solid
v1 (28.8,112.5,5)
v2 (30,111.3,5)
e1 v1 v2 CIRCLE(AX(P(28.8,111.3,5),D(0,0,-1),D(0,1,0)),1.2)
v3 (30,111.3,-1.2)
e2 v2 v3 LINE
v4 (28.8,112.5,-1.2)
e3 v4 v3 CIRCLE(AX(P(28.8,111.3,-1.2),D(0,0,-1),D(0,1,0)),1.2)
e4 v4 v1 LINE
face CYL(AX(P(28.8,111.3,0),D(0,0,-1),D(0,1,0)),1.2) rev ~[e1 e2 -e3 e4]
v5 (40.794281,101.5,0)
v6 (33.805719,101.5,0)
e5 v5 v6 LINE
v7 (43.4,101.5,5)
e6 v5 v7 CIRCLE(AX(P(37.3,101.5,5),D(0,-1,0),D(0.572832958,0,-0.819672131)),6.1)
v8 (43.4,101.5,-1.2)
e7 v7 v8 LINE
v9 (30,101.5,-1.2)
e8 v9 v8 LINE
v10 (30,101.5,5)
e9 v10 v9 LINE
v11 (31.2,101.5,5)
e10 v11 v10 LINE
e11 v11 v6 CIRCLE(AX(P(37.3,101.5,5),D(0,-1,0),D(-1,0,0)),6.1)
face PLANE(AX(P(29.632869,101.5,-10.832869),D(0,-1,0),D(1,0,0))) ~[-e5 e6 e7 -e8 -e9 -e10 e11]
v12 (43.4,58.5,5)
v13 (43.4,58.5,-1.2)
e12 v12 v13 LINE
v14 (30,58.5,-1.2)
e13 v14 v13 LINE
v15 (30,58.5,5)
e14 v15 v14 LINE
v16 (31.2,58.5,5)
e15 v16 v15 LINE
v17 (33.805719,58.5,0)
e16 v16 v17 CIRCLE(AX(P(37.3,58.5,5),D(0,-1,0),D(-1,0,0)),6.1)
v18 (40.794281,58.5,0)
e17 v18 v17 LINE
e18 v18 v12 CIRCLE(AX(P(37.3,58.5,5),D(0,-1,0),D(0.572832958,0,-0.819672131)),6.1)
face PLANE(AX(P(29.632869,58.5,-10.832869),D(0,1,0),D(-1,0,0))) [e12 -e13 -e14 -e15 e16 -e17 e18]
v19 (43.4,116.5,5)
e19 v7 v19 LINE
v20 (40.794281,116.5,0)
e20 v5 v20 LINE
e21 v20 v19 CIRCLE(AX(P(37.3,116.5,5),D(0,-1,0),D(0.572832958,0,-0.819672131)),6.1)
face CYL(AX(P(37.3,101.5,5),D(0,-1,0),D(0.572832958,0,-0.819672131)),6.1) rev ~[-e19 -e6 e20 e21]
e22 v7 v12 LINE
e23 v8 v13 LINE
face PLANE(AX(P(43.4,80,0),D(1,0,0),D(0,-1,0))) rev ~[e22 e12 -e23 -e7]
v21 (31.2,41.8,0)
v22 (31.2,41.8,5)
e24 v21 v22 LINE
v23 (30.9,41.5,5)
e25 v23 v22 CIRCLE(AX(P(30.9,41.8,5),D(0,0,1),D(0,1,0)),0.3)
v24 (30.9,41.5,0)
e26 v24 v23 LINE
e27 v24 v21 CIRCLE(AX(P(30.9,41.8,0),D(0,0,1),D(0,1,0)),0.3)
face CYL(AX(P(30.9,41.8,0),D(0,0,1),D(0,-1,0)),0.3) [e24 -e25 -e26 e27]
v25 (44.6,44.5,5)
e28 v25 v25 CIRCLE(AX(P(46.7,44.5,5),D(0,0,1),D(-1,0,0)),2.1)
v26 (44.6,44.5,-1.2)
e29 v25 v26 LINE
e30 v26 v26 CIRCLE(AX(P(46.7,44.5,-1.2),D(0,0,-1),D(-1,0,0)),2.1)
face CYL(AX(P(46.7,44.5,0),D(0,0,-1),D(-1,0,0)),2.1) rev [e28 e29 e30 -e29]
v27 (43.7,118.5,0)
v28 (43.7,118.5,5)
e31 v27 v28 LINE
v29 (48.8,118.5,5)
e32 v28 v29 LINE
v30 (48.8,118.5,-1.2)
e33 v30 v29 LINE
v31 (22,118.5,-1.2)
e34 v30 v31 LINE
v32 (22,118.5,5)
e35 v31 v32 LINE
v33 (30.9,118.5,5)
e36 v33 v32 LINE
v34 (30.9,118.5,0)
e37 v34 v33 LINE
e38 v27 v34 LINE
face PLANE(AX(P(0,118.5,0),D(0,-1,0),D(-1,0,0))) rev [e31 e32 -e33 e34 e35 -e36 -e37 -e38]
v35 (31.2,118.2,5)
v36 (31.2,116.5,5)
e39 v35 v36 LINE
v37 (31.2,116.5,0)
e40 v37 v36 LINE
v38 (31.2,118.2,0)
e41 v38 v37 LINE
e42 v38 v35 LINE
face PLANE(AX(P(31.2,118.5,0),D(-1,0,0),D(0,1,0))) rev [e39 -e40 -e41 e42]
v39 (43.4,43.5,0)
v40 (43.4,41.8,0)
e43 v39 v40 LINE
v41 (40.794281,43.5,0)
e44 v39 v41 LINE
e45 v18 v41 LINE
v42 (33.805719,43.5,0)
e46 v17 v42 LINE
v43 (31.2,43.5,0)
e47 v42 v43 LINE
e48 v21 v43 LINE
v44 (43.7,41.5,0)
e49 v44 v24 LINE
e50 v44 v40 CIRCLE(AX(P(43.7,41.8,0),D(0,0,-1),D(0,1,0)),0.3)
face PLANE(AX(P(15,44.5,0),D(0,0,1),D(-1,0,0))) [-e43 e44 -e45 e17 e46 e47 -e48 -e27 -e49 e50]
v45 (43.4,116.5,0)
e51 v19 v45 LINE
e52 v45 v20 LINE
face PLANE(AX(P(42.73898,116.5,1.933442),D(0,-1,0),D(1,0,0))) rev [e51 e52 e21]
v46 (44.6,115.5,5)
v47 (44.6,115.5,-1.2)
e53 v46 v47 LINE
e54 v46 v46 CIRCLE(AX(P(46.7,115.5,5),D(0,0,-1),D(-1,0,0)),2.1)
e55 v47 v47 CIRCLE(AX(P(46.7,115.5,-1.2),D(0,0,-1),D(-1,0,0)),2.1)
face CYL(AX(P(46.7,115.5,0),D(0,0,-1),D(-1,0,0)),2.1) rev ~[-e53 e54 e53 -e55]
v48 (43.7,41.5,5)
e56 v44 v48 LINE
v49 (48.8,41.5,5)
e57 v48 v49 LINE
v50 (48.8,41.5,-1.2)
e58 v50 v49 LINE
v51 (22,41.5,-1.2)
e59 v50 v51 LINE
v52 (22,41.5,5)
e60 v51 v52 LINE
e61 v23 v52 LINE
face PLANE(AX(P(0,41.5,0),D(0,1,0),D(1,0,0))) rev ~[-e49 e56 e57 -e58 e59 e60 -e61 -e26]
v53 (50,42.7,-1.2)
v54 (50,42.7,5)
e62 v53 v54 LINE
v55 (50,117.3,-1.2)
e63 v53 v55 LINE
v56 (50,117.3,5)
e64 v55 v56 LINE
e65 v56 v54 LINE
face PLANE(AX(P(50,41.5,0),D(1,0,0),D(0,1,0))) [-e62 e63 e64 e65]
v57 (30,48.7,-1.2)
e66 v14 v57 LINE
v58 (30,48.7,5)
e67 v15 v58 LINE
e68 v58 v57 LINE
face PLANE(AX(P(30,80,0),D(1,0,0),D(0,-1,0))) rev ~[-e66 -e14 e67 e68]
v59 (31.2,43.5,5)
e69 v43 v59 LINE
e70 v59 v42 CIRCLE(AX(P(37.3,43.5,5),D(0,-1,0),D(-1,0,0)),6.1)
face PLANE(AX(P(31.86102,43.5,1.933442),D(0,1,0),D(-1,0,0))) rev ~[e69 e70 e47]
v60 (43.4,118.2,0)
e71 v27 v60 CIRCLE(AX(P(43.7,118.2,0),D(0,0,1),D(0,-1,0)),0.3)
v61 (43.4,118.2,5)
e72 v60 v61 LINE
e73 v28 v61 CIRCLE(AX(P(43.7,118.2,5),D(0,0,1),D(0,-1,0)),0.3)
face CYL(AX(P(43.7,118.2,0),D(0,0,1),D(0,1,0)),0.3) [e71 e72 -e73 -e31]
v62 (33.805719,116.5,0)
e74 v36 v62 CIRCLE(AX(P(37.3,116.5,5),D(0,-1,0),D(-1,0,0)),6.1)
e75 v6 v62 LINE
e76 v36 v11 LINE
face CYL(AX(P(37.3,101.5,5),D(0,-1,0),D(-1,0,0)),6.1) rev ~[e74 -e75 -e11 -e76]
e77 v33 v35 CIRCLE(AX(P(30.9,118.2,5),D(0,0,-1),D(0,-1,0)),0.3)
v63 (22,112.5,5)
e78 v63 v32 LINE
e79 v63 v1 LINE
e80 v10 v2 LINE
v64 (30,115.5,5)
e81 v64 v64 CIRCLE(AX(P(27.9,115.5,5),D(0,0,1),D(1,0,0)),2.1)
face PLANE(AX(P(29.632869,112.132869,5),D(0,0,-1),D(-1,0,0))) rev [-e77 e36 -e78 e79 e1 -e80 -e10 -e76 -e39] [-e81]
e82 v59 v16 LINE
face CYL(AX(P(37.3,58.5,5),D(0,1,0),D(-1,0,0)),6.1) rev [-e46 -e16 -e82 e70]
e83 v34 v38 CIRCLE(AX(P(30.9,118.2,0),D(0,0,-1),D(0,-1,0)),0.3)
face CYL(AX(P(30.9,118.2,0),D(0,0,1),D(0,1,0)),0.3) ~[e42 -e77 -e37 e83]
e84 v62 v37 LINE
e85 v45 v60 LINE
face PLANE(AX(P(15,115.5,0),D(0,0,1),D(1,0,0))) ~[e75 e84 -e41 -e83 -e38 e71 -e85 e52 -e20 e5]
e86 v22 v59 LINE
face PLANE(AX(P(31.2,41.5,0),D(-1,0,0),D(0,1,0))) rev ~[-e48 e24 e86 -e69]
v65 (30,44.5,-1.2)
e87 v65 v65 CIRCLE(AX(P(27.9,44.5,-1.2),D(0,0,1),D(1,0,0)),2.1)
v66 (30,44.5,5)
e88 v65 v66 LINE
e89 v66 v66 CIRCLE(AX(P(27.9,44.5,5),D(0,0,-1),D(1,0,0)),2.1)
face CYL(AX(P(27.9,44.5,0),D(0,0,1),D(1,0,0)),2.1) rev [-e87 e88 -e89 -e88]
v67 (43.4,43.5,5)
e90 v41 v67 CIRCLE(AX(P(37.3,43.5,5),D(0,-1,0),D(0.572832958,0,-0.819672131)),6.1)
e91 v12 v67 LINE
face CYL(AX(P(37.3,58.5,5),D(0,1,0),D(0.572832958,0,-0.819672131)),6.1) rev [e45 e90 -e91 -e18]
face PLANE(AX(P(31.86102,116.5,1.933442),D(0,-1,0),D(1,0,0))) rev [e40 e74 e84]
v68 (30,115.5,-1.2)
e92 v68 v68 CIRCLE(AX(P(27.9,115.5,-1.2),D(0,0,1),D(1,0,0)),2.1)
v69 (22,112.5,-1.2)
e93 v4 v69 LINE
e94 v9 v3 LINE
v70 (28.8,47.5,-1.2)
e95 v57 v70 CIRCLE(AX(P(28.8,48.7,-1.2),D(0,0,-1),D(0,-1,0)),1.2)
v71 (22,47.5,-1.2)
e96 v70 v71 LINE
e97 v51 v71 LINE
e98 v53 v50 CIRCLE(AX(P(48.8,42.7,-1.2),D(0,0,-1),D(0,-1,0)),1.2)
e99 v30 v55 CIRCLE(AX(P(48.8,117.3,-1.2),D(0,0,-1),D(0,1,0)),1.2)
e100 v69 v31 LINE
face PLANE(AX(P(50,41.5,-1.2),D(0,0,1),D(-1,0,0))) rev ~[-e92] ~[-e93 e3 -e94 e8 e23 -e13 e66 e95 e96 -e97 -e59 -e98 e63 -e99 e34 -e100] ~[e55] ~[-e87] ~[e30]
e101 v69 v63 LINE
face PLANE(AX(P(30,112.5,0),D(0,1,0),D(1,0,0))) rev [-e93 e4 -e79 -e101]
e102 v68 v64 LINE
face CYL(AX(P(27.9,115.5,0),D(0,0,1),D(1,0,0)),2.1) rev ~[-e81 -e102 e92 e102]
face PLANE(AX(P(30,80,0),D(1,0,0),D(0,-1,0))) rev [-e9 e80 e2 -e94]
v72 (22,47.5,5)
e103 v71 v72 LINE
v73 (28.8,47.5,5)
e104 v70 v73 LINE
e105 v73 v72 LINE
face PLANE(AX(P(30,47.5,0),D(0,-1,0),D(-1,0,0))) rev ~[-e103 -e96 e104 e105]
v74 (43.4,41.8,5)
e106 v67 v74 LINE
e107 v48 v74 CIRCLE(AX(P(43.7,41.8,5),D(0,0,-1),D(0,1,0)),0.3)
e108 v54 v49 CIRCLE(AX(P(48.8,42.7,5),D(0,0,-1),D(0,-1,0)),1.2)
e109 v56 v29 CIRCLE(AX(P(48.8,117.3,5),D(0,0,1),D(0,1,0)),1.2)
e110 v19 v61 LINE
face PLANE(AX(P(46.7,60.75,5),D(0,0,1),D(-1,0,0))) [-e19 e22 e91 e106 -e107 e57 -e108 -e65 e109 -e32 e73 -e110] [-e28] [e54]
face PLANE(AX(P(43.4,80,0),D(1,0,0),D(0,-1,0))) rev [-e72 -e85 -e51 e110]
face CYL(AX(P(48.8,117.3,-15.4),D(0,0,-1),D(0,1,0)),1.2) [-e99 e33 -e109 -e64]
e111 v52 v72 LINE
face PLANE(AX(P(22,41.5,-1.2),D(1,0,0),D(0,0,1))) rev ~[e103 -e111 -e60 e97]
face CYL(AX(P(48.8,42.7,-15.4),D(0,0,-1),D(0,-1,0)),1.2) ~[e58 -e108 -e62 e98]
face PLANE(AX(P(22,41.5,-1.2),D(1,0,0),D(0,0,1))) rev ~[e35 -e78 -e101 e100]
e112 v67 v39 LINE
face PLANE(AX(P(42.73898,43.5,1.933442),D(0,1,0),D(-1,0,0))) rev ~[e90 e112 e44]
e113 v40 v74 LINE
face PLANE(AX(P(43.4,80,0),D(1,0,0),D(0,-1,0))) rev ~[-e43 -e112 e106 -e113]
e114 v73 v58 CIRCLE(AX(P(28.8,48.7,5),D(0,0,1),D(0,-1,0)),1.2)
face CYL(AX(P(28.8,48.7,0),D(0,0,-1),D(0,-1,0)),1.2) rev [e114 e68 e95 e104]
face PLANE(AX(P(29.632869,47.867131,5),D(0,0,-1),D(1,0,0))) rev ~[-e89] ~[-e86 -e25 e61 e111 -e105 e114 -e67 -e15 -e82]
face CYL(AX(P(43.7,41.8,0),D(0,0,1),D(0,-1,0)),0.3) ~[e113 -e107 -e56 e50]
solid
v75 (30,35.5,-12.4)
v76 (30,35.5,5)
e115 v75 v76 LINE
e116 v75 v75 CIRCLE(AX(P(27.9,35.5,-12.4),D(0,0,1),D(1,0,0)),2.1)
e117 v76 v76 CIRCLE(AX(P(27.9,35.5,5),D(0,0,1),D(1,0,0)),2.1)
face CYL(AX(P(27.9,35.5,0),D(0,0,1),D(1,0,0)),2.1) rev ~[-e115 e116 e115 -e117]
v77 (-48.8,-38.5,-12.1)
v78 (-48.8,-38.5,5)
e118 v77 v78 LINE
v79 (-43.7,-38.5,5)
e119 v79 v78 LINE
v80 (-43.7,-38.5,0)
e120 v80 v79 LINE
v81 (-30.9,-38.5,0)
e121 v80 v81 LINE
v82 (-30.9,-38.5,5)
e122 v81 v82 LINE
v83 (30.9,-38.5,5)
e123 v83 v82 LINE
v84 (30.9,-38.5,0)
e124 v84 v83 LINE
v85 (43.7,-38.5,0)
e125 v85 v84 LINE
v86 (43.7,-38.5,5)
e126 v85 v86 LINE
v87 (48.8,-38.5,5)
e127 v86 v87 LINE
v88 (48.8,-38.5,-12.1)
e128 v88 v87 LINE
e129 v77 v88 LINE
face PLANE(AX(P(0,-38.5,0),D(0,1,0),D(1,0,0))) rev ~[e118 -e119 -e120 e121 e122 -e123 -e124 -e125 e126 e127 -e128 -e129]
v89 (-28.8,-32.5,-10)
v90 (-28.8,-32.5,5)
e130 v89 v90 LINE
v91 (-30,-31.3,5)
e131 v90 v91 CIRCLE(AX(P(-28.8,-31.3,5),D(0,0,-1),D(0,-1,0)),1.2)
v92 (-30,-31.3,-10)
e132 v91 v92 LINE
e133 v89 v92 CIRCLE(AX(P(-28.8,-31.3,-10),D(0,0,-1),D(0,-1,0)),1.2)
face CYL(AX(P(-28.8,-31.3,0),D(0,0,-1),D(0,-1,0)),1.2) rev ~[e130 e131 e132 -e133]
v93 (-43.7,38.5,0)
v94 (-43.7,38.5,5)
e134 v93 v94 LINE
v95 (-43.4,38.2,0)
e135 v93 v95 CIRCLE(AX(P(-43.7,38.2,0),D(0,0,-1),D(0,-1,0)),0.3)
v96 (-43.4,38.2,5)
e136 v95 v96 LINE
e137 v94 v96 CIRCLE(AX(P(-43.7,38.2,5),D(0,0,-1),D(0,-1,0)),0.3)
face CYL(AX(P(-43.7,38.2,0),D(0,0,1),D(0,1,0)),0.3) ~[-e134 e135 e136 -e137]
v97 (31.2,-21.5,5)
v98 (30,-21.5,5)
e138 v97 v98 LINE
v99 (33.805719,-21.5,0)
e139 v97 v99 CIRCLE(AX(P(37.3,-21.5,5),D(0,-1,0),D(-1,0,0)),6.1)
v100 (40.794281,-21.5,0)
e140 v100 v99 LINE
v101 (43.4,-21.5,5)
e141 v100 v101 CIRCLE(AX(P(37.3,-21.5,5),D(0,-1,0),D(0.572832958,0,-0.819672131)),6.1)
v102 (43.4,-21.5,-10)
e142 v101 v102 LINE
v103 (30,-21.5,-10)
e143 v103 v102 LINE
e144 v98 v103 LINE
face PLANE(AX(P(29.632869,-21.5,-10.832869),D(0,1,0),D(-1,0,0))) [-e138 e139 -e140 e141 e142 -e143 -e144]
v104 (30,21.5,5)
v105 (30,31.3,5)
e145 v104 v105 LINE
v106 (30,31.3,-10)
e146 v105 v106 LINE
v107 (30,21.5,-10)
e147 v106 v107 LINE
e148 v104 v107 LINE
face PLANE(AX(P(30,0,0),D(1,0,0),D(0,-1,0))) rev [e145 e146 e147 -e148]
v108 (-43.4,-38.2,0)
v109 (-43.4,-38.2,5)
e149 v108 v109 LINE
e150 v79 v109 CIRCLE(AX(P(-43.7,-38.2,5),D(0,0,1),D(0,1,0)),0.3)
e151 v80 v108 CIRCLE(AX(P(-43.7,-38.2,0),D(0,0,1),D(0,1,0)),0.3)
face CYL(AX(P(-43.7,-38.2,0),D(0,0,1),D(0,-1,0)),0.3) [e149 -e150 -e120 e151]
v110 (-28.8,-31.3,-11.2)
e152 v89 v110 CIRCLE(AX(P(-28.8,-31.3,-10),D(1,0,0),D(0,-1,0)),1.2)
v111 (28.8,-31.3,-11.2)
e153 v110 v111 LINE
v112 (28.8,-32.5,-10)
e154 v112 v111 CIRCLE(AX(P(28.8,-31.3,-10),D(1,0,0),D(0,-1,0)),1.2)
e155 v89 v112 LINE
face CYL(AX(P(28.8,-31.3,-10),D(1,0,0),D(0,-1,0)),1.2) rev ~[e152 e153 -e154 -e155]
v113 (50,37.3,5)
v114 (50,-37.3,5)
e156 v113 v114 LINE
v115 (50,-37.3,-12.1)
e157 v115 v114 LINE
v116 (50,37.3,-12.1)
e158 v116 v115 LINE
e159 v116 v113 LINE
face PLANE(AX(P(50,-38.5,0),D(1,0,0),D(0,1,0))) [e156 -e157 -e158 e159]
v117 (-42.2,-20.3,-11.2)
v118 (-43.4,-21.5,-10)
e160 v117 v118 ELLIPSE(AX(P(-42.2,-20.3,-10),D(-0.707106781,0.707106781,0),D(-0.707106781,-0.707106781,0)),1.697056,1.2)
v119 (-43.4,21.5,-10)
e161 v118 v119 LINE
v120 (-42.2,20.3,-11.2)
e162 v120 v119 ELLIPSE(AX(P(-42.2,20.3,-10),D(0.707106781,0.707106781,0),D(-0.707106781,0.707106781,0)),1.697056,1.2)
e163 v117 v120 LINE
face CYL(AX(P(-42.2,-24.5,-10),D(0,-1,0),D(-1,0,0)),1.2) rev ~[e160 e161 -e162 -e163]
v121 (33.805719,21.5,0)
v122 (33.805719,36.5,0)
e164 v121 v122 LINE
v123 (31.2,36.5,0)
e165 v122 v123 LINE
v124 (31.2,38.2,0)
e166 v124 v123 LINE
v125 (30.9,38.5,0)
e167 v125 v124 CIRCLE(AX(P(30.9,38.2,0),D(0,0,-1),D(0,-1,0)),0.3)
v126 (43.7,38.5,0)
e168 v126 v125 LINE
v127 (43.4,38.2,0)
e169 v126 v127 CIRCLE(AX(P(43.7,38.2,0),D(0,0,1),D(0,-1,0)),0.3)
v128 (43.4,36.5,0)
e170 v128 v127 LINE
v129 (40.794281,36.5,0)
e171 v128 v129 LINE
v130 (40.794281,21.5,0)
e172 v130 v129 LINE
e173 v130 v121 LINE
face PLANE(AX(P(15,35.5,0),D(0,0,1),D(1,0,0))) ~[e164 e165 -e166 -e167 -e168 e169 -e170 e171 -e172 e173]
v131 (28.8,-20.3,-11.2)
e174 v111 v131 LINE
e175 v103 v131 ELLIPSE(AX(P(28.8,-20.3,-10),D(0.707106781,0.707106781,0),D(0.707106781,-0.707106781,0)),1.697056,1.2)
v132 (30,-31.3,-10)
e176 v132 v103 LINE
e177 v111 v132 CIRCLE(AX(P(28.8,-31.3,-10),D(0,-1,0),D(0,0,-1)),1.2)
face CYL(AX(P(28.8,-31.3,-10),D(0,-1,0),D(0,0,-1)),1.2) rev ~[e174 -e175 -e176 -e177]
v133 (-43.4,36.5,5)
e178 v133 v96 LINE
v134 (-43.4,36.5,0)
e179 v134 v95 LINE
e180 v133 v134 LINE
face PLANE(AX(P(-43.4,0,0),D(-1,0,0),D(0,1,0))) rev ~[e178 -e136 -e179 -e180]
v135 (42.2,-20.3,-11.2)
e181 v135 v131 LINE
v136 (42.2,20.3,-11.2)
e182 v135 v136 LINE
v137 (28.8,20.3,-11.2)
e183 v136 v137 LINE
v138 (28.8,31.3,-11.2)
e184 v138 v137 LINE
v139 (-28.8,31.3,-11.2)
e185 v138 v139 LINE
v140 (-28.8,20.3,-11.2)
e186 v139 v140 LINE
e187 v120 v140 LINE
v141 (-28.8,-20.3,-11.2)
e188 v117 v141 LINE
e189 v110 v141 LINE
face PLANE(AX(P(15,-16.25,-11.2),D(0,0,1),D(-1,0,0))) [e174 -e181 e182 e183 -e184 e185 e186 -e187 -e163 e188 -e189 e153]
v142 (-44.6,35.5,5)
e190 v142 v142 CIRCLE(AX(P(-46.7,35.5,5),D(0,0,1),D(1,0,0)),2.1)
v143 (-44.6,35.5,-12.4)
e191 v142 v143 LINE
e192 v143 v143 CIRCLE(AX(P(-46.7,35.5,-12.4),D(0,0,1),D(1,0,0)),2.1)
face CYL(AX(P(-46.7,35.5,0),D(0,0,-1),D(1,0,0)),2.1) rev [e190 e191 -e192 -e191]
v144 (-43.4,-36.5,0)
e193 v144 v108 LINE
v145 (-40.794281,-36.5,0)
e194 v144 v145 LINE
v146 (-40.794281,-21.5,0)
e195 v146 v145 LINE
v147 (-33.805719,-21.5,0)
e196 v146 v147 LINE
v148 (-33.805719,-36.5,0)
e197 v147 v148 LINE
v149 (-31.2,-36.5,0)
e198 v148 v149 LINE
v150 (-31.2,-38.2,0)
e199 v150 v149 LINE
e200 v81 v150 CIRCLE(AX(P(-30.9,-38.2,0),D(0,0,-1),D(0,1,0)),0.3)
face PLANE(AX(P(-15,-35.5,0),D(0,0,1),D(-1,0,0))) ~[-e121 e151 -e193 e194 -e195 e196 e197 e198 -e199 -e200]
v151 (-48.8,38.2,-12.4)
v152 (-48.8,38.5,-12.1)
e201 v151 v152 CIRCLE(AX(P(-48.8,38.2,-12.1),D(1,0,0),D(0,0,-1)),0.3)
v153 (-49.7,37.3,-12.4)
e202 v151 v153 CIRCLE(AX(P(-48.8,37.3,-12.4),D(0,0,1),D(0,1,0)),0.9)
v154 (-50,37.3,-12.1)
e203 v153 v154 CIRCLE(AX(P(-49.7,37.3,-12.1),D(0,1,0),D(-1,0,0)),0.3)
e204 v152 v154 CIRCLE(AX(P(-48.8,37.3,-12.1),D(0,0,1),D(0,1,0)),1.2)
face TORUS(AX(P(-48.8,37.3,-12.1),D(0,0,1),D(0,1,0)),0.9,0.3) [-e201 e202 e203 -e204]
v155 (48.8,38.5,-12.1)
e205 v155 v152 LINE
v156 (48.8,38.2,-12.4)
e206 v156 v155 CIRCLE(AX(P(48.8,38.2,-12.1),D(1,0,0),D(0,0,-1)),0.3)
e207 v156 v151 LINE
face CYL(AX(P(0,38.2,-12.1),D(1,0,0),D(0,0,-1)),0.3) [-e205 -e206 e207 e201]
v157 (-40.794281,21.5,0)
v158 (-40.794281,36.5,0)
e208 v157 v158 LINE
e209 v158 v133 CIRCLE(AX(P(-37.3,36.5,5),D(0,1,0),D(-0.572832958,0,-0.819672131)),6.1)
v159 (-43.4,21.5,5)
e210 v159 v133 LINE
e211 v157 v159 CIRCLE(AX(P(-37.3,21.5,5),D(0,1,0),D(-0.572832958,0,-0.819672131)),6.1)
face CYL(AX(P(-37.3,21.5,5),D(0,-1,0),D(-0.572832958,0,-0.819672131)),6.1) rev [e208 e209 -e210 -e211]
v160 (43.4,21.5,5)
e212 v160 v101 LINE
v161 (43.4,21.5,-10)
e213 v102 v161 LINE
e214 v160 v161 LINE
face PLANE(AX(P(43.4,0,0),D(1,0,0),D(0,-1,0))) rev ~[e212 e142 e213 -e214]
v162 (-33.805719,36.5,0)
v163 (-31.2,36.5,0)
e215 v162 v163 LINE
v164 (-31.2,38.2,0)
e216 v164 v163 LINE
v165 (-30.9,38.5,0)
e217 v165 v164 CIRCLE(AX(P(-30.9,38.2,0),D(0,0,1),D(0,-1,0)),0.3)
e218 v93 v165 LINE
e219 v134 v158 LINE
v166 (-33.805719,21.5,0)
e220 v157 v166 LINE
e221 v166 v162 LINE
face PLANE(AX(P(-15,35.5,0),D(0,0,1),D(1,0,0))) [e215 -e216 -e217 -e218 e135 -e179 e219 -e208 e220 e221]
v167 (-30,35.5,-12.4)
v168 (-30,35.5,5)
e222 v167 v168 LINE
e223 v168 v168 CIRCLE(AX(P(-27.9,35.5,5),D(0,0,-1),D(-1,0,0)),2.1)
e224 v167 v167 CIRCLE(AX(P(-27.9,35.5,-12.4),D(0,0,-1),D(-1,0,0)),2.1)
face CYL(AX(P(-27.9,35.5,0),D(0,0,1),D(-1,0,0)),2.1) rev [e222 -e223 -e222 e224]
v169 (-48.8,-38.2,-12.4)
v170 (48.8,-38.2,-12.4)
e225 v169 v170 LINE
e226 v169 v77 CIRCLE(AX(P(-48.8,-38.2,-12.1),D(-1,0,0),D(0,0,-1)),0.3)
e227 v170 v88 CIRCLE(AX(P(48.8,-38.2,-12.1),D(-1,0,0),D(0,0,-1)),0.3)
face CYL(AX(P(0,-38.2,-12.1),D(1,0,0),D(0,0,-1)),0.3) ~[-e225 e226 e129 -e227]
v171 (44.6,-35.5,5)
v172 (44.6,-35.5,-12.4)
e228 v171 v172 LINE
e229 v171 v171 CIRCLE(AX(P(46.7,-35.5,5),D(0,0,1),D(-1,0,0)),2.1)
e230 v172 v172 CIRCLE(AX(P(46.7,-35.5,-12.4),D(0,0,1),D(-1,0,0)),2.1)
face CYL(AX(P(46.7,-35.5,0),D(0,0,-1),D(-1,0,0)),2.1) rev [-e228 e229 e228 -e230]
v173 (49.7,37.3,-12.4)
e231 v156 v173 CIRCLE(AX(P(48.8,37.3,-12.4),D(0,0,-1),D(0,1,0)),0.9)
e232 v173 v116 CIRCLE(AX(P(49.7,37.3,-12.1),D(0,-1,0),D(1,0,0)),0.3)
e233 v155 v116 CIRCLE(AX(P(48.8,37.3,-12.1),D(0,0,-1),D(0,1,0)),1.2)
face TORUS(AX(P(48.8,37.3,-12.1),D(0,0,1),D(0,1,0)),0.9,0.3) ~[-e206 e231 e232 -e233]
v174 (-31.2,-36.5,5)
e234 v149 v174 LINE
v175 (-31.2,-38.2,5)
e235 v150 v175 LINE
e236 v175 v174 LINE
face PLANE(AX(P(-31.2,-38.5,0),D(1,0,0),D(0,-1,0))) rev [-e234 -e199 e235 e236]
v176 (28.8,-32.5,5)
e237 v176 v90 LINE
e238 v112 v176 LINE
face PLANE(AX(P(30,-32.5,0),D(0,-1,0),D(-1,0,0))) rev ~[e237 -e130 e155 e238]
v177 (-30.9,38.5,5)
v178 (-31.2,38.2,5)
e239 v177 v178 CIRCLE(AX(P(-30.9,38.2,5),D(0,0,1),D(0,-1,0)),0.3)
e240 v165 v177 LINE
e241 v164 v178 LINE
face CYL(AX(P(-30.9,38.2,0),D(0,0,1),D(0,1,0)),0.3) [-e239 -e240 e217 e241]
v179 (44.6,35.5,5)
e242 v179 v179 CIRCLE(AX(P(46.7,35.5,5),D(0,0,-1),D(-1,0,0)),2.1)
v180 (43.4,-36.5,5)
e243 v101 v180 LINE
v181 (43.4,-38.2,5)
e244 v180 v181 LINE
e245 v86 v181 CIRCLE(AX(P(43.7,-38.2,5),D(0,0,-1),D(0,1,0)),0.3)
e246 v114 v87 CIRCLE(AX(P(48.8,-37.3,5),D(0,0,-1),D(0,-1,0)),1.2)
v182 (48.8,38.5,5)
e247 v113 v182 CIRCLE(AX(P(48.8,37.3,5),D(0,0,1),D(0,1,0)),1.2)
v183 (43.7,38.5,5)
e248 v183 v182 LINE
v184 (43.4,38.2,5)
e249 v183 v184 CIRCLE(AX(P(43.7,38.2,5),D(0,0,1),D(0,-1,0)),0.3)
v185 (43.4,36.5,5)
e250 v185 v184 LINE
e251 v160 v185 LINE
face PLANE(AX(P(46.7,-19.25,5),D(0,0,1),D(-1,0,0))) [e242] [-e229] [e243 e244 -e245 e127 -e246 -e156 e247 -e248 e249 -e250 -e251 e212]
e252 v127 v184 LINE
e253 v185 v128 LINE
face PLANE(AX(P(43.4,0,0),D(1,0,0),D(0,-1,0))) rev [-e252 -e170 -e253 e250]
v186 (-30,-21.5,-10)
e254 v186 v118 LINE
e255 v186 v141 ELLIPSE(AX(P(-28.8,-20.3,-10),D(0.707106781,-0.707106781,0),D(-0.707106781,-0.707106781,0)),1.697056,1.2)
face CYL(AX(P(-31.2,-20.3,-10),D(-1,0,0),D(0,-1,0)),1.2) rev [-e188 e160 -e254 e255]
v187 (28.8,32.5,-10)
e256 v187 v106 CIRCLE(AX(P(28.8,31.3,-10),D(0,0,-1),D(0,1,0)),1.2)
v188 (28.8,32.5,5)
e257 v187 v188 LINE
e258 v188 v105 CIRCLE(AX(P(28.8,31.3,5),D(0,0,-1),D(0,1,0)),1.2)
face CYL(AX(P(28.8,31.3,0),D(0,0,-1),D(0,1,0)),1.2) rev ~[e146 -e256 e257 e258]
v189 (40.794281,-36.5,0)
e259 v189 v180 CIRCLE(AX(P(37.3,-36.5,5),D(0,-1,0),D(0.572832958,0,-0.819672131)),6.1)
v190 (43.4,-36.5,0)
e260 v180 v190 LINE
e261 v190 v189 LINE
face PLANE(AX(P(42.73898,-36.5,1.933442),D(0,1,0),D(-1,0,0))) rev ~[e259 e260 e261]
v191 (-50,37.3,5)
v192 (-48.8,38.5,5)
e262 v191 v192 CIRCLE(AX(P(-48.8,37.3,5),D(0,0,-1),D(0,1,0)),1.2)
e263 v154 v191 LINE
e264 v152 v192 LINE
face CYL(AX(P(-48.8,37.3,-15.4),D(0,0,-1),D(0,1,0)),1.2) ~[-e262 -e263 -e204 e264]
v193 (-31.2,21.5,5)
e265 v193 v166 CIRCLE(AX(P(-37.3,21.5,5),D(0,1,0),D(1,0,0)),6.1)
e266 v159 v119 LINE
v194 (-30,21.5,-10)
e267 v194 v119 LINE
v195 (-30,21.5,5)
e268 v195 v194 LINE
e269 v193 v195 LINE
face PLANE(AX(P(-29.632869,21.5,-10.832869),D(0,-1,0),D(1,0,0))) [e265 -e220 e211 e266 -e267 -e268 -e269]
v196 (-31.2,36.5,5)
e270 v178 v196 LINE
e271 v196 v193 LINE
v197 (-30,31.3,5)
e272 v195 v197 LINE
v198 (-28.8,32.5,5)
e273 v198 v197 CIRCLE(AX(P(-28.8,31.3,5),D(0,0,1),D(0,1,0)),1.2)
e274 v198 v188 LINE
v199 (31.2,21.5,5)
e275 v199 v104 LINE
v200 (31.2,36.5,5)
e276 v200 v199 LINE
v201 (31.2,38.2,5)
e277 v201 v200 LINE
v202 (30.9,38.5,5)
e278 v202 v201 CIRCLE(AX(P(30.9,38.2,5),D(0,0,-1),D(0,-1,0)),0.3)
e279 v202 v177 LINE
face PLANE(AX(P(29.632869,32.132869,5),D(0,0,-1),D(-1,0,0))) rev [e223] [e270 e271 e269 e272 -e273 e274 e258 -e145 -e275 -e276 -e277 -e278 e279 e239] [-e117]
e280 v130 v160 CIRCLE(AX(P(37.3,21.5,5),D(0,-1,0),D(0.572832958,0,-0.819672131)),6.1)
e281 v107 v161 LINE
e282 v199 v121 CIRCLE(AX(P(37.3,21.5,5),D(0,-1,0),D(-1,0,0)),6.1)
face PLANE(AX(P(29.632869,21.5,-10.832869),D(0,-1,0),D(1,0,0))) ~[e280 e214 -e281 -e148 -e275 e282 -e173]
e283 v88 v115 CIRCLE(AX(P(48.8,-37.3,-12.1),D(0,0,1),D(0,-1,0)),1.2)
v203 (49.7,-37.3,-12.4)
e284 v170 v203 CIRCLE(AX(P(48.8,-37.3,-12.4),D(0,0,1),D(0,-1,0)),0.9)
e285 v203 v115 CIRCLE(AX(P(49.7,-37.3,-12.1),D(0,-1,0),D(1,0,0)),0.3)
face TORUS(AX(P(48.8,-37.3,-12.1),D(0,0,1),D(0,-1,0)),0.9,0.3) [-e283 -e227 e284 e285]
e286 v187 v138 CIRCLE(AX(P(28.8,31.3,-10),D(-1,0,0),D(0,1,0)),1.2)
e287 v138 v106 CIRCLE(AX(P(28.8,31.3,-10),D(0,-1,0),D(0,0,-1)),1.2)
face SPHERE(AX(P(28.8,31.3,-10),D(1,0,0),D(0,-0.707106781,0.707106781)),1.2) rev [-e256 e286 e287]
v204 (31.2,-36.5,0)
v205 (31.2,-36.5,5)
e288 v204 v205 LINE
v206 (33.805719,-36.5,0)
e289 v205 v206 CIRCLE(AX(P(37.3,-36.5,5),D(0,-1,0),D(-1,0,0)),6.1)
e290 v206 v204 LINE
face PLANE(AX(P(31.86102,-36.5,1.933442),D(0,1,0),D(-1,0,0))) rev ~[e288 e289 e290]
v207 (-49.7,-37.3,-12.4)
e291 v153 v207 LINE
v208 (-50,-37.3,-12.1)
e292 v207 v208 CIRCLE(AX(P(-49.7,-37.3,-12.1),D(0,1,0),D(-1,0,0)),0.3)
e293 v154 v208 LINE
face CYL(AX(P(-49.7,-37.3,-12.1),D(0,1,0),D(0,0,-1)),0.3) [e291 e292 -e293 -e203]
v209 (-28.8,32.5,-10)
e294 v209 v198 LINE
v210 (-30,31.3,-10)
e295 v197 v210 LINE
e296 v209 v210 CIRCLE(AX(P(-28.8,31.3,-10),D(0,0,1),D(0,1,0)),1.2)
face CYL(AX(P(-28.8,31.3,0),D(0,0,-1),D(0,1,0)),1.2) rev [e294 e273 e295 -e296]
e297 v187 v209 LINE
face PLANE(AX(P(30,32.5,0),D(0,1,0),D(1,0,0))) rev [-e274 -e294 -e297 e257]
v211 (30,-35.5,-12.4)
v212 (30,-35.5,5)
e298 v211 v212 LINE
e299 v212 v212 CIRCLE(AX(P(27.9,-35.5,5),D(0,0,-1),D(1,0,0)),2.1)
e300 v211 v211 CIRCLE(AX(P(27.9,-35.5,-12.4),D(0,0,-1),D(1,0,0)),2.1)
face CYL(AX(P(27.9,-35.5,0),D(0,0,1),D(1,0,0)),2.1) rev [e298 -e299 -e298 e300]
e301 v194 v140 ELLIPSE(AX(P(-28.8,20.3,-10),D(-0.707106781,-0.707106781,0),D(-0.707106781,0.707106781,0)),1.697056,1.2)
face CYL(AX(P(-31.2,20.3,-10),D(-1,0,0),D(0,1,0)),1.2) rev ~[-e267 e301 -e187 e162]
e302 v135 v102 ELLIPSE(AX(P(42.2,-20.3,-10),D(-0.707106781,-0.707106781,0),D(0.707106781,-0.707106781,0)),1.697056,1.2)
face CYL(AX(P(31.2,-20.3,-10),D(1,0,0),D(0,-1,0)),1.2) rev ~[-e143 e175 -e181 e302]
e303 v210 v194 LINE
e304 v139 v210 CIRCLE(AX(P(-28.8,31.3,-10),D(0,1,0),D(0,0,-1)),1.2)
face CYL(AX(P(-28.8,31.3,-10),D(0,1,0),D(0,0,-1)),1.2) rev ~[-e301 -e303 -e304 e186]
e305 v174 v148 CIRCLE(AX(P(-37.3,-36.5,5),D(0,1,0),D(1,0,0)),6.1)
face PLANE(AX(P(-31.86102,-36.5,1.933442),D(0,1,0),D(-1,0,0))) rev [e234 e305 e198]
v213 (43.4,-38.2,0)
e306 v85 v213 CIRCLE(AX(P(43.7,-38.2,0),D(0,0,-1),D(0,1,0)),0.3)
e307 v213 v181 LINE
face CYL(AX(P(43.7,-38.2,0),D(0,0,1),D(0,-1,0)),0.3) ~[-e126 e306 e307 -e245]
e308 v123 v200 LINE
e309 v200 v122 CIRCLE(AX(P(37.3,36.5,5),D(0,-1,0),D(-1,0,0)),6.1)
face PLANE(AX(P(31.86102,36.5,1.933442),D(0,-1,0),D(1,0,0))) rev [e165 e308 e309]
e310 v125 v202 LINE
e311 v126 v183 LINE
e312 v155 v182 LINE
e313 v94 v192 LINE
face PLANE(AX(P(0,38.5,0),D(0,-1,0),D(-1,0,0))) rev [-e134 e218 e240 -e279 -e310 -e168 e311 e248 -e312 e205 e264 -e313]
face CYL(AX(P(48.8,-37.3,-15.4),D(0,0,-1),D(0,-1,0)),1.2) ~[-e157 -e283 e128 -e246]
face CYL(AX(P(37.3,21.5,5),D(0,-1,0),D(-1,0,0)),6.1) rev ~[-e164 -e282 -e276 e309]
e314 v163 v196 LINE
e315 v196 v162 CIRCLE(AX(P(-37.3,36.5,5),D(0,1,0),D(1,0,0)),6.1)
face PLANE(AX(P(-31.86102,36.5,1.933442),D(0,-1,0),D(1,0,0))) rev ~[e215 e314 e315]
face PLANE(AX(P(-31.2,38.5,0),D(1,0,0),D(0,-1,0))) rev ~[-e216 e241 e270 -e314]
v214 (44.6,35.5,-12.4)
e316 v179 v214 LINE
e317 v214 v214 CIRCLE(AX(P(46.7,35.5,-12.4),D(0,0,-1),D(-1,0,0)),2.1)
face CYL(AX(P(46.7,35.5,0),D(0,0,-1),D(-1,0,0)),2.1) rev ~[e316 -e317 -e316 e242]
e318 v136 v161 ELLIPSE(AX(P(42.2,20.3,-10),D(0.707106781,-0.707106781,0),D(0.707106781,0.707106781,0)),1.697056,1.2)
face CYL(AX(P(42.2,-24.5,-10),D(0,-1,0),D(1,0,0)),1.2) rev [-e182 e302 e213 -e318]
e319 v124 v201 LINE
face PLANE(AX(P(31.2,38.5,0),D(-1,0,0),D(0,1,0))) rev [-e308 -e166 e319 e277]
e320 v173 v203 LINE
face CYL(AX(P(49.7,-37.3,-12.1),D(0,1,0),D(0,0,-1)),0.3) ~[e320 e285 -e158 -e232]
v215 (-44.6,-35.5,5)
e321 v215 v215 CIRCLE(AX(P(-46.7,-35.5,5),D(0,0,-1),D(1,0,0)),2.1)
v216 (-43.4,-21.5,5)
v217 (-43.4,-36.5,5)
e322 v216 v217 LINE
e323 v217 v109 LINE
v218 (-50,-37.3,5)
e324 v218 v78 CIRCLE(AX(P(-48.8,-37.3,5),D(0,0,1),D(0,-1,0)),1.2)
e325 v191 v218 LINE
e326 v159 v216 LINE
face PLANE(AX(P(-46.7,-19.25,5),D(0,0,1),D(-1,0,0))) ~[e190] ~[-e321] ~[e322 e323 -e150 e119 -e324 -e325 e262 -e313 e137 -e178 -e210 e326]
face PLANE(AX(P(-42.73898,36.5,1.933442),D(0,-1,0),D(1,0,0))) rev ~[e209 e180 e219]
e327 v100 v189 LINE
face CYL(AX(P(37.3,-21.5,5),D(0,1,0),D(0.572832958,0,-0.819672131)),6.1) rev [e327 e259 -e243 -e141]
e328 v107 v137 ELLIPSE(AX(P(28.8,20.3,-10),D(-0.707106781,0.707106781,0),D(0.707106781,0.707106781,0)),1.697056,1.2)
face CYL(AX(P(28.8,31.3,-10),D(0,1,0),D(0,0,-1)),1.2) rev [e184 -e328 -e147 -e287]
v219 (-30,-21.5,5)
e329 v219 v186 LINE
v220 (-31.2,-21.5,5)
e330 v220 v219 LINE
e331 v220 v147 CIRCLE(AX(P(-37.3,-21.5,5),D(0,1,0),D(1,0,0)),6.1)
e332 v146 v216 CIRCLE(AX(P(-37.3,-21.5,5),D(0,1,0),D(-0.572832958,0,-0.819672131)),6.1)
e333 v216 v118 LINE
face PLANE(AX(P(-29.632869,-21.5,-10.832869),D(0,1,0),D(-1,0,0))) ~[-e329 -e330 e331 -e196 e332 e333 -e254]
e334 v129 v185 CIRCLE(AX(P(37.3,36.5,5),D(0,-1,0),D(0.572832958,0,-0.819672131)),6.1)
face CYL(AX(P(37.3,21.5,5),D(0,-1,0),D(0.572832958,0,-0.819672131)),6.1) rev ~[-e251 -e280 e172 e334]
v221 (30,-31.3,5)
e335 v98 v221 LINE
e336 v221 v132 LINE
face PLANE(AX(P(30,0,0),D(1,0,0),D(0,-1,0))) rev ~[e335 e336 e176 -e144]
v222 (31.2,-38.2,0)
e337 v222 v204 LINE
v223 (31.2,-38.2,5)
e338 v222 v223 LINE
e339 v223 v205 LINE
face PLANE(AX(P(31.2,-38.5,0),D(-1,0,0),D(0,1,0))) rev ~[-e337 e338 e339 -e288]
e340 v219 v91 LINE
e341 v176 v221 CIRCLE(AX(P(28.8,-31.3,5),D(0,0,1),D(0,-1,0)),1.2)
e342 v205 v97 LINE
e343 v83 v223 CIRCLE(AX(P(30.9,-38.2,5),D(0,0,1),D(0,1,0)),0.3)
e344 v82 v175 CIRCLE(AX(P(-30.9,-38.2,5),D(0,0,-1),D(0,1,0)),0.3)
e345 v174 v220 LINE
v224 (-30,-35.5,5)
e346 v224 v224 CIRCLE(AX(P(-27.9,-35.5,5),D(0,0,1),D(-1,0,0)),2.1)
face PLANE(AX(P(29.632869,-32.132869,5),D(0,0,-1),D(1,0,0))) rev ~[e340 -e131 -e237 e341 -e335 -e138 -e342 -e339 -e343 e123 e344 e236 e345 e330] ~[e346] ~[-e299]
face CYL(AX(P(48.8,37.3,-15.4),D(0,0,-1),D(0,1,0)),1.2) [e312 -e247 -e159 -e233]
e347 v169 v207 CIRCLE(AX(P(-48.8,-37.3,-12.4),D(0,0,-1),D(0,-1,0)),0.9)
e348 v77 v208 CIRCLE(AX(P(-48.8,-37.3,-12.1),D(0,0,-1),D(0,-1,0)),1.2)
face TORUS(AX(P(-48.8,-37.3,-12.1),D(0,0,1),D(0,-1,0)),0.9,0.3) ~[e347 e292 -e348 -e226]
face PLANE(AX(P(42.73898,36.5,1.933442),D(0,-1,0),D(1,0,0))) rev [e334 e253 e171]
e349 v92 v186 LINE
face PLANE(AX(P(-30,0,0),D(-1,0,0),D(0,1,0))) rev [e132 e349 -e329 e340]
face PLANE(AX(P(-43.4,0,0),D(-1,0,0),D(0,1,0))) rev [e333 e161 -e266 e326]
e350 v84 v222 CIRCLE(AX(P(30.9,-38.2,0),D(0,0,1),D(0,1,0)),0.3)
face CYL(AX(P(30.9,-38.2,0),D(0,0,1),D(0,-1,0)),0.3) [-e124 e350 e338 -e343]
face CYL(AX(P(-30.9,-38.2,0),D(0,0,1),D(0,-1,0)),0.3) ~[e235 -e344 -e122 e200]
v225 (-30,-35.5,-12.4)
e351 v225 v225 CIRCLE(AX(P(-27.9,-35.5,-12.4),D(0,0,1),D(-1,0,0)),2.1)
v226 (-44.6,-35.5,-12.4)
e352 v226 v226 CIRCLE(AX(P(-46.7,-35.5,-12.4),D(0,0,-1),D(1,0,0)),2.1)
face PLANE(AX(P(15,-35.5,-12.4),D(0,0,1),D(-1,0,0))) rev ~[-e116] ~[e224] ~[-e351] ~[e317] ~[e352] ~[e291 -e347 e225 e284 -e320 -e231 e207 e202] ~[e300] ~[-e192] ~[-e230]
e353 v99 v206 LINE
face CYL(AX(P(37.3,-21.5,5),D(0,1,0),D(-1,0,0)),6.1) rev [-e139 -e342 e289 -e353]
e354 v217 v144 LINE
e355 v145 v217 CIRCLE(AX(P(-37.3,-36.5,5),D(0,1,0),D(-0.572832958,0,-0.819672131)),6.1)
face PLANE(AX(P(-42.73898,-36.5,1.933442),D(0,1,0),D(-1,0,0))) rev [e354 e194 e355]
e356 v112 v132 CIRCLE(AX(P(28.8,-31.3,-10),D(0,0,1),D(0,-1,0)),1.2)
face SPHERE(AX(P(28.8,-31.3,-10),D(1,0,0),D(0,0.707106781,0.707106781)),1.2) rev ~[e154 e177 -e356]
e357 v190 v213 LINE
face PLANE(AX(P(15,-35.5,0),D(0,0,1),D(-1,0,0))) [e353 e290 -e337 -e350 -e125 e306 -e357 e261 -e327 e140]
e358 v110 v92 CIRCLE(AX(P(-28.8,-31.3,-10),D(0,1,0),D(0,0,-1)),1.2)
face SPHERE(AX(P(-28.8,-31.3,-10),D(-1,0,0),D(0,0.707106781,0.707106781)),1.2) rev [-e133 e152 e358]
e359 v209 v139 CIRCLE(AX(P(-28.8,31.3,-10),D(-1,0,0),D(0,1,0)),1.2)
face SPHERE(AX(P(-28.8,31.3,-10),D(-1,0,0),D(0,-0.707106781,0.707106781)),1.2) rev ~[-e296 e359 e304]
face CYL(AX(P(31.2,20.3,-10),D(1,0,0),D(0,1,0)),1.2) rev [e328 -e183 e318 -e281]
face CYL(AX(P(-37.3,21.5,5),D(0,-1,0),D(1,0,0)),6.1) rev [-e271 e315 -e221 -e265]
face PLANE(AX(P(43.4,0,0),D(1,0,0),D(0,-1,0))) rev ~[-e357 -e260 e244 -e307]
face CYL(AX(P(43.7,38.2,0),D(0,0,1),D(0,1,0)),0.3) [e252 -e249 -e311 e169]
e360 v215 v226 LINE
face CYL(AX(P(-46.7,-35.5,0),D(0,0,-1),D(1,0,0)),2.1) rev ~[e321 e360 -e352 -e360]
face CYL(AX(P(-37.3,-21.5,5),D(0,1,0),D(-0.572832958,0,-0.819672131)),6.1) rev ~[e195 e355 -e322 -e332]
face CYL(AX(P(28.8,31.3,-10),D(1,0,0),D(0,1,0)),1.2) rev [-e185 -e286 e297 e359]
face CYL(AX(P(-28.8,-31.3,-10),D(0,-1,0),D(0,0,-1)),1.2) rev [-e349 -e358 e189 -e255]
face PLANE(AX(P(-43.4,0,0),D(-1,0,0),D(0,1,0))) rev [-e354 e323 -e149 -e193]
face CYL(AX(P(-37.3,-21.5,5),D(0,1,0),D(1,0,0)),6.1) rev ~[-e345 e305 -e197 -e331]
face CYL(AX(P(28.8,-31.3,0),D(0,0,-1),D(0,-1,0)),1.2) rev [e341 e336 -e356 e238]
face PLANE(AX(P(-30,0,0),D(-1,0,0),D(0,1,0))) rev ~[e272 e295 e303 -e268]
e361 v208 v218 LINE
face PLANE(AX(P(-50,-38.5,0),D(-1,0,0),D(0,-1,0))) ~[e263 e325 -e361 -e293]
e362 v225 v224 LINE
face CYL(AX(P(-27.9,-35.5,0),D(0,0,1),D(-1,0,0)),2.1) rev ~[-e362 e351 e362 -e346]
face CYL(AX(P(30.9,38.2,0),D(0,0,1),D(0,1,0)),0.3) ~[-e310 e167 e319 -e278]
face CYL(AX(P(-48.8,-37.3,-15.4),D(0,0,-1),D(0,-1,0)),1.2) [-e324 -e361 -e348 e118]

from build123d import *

# Parameters (mm, degrees)
F0_W         = 30
F0_H         = 32.5
F0_W_2       = 12.2
F0_H_2       = 21.5
F0_R         = 2.1
F0_H_3       = 15
F0_H_4       = 2
F1_DEPTH     = 12.4
F2_DEPTH     = 11.2
F3_DEPTH     = 5
F5_DEPTH     = 1.2
F7_DEPTH     = 15
F8_T1_DEPTH  = 24.5
F8_T3_DEPTH  = 15.2
F8_T5_DEPTH  = 10
F8_T7_DEPTH  = 5
F8_T9_DEPTH  = 9.8
F8_T11_DEPTH = 28.8
F8_T13_DEPTH = 1.2
F8_S17_W     = 1.2
F8_S17_H     = 1.2
F8_T18_DEPTH = 1.2
F8_T25_DEPTH = 4.2
F8_T29_DEPTH = 12.8
F8_T32_DEPTH = 23.4
F9_R         = 0.3
F14_DEPTH    = 77


# Not quite as in the source:
# - a fillet or chamfer that OpenCascade refuses, or shapes differently, is made with other operations: its cross-section is extruded or revolved along the edge and cut away or added


with BuildPart() as f1:
    # F0 (on Top) → F1 (new body)
    with BuildSketch(Plane.XY):
        Polygon((-30, 32.5), (0, 32.5), (0, 38.5), (-30, 38.5), (-30, 35.5), align=None)
        with BuildLine():
            ThreePointArc((-25.8, 35.5), (-27.9, 33.4), (-30, 35.5))
            ThreePointArc((-30, 35.5), (-27.9, 37.6), (-25.8, 35.5))
        make_face(mode=Mode.SUBTRACT)
        with Locations((-15, 16.25)):
            Rectangle(F0_W, F0_H)
        with Locations((-37.3, 10.75)):
            Rectangle(F0_W_2, F0_H_2)
        Polygon((-50, 0), (-43.4, 0), (-43.4, 21.5), (-43.4, 36.5), (-43.4, 38.5), (-50, 38.5), align=None)
        with Locations((-46.7, 35.5)):
            Circle(F0_R, mode=Mode.SUBTRACT)
        with Locations((-37.3, 29)):
            Rectangle(F0_W_2, F0_H_3)
        with Locations((-37.3, 37.5)):
            Rectangle(F0_W_2, F0_H_4)
        Polygon((-31.2, 0), (-30, 0), (-30, 32.5), (-30, 35.5), (-30, 38.5), (-31.2, 38.5), (-31.2, 36.5), (-31.2, 21.5), align=None)
    extrude(amount=-F1_DEPTH)

    # F0 (on Top) → F2 (cut)
    with BuildSketch(Plane.XY):
        with Locations((-15, 16.25)):
            Rectangle(F0_W, F0_H)
        with Locations((-37.3, 10.75)):
            Rectangle(F0_W_2, F0_H_2)
    extrude(amount=-F2_DEPTH, mode=Mode.SUBTRACT)

    # F0 (on Top) → F3 (join)
    with BuildSketch(Plane.XY):
        Polygon((-30, 32.5), (0, 32.5), (0, 38.5), (-30, 38.5), (-30, 35.5), align=None)
        with BuildLine():
            ThreePointArc((-25.8, 35.5), (-27.9, 33.4), (-30, 35.5))
            ThreePointArc((-30, 35.5), (-27.9, 37.6), (-25.8, 35.5))
        make_face(mode=Mode.SUBTRACT)
        Polygon((-31.2, 0), (-30, 0), (-30, 32.5), (-30, 35.5), (-30, 38.5), (-31.2, 38.5), (-31.2, 36.5), (-31.2, 21.5), align=None)
        Polygon((-50, 0), (-43.4, 0), (-43.4, 21.5), (-43.4, 36.5), (-43.4, 38.5), (-50, 38.5), align=None)
        with Locations((-46.7, 35.5)):
            Circle(F0_R, mode=Mode.SUBTRACT)
    extrude(amount=F3_DEPTH)

    # F4 (on face) → F5 (cut, through all)
    with BuildSketch(Plane(origin=(-31.2, 0, 0), x_dir=(0, -1, 0), z_dir=(-1, 0, 0))):
        Polygon((-21.5, 0), (-21.5, -11.2), (0, -11.2), (0, 5), (-21.5, 5), align=None)
    extrude(amount=-F5_DEPTH, mode=Mode.SUBTRACT)

    # F6 (on face) → F7 (join)
    with BuildSketch(Plane.XZ.offset(-21.5)):
        with BuildLine():
            ThreePointArc((-31.2, 5), (-31.8905122999, 2.1808790693), (-33.8057189581, 0))
            Line((-33.8057189581, 0), (-31.2, 0))
            Line((-31.2, 0), (-31.2, 5))
        make_face()
        with BuildLine():
            ThreePointArc((-40.7942810419, 0), (-42.7094877001, 2.1808790693), (-43.4, 5))
            Line((-43.4, 5), (-43.4, 0))
            Line((-43.4, 0), (-40.7942810419, 0))
        make_face()
    extrude(amount=-F7_DEPTH)

    # F8: fillet of radius 1.2 on 9 edges, made by hand

    # F8_s2 → F8_t1 (join)
    with BuildSketch(Plane.XZ.offset(-24.5)):
        with BuildLine():
            ThreePointArc((-43.4, -10), (-43.0485281374, -10.8485281374), (-42.2, -11.2))
            Line((-42.2, -11.2), (-43.4, -11.2))
            Line((-43.4, -11.2), (-43.4, -10))
        make_face()
    extrude(amount=F8_T1_DEPTH)

    # F8_s4 → F8_t3 (join)
    with BuildSketch(Plane.YZ.offset(-46.4)):
        with BuildLine():
            ThreePointArc((21.5, -10), (21.1485281374, -10.8485281374), (20.3, -11.2))
            Line((20.3, -11.2), (21.5, -11.2))
            Line((21.5, -11.2), (21.5, -10))
        make_face()
    extrude(amount=F8_T3_DEPTH)

    # F8_s6 → F8_t5 (join)
    with BuildSketch(Plane.XY.offset(-10)):
        with BuildLine():
            ThreePointArc((-28.8, 32.5), (-29.6485281374, 32.1485281374), (-30, 31.3))
            Line((-30, 31.3), (-30, 32.5))
            Line((-30, 32.5), (-28.8, 32.5))
        make_face()
    extrude(amount=F8_T5_DEPTH)

    # F8_s8 → F8_t7 (join)
    with BuildSketch(Plane.XY):
        with BuildLine():
            ThreePointArc((-28.8, 32.5), (-29.6485281374, 32.1485281374), (-30, 31.3))
            Line((-30, 31.3), (-30, 32.5))
            Line((-30, 32.5), (-28.8, 32.5))
        make_face()
    extrude(amount=F8_T7_DEPTH)

    # F8_s10 → F8_t9 (join)
    with BuildSketch(Plane.XZ.offset(-31.3)):
        with BuildLine():
            ThreePointArc((-28.8, -11.2), (-29.6485281374, -10.8485281374), (-30, -10))
            Line((-30, -10), (-30, -11.2))
            Line((-30, -11.2), (-28.8, -11.2))
        make_face()
    extrude(amount=F8_T9_DEPTH)

    # F8_s12 → F8_t11 (join)
    with BuildSketch(Plane.YZ.offset(-28.8)):
        with BuildLine():
            ThreePointArc((32.5, -10), (32.1485281374, -10.8485281374), (31.3, -11.2))
            Line((31.3, -11.2), (32.5, -11.2))
            Line((32.5, -11.2), (32.5, -10))
        make_face()
    extrude(amount=F8_T11_DEPTH)

    # F8_s14 → F8_t13 (join)
    with BuildSketch(Plane.YZ.offset(-31.2)):
        with BuildLine():
            ThreePointArc((21.5, -10), (21.1485281374, -10.8485281374), (20.3, -11.2))
            Line((20.3, -11.2), (21.5, -11.2))
            Line((21.5, -11.2), (21.5, -10))
        make_face()
    extrude(amount=F8_T13_DEPTH)


with BuildPart() as f8_tool16:
    # F8_s17 → F8_t18 (new body)
    with BuildSketch(Plane.YZ.offset(-28.8)):
        with Locations((31.9, -10.6)):
            Rectangle(F8_S17_W, F8_S17_H)
    extrude(amount=-F8_T18_DEPTH)

    # F8_s19 → F8_t20 (revolve, cut)
    with BuildSketch(Plane(origin=(-28.8, 31.3, -10), x_dir=(0, -0.7071067812, 0.7071067812), z_dir=(0, -0.7071067812, -0.7071067812))):
        with BuildLine():
            ThreePointArc((0, -1.2), (1.2, 0), (0, 1.2))
            Line((0, 1.2), (0, -1.2))
        make_face()
    revolve(axis=Axis((-28.8, 31.3, -10), (-1, 0, 0)), mode=Mode.SUBTRACT)


with BuildPart() as f1_1:
    add(f1.part)

    # F8_t15: union F8_tool16
    add(f8_tool16.part)


with BuildPart() as f8_tool23:
    # F8_s24 → F8_t25 (new body)
    with BuildSketch(Plane.YZ.offset(-31.2)):
        with BuildLine():
            ThreePointArc((21.5, -10), (21.1485281374, -10.8485281374), (20.3, -11.2))
            Line((20.3, -11.2), (21.5, -11.2))
            Line((21.5, -11.2), (21.5, -10))
        make_face()
    extrude(amount=F8_T25_DEPTH)

    split(bisect_by=Plane.YZ.offset(-30), keep=Keep.TOP)


with BuildPart() as f8_tool27:
    # F8_s28 → F8_t29 (new body)
    with BuildSketch(Plane.XZ.offset(-31.3)):
        with BuildLine():
            ThreePointArc((-28.8, -11.2), (-29.6485281374, -10.8485281374), (-30, -10))
            Line((-30, -10), (-30, -11.2))
            Line((-30, -11.2), (-28.8, -11.2))
        make_face()
    extrude(amount=F8_T29_DEPTH)

    split(bisect_by=Plane.XZ.offset(-21.5), keep=Keep.TOP)


with BuildPart() as f8_tool23_1:
    add(f8_tool23.part)

    # F8_t31: intersect F8_tool27
    add(f8_tool27.part, mode=Mode.INTERSECT)


with BuildPart() as f1_2:
    add(f1_1.part)

    # F8_t21: union F8_tool23
    add(f8_tool23_1.part)

    # F8_s33 → F8_t32 (cut)
    with BuildSketch(Plane.XY.offset(-15.4)):
        with BuildLine():
            ThreePointArc((-48.8, 38.5), (-49.6485281374, 38.1485281374), (-50, 37.3))
            Line((-50, 37.3), (-50, 38.5))
            Line((-50, 38.5), (-48.8, 38.5))
        make_face()
    extrude(amount=F8_T32_DEPTH, mode=Mode.SUBTRACT)

    # F9
    f9_edges = [f1_2.edges().sort_by_distance(p)[0] for p in [
        (-50, 18.65, -12.4),
        (-31.2, 38.5, 2.5),
        (-43.4, 38.5, 2.5),
        (-24.4, 38.5, -12.4),
        (-49.648528, 38.148528, -12.4),
    ]]
    fillet(f9_edges, radius=F9_R)

    # F10: F1 across face


with BuildPart() as f1_3:
    add(f1_2.part)
    add(f1_2.part.mirror(Plane(origin=(-38.9064033059, 0, -6.2352362766), x_dir=(1, 0, 0), z_dir=(0, -1, 0))))

    # F11: F1 across face


with BuildPart() as f1_4:
    add(f1_3.part)
    add(f1_3.part.mirror(Plane(origin=(0, 0, -5.9128802639), x_dir=(0, 1, 0), z_dir=(1, 0, 0))))


with BuildPart() as f12_1:
    # F12: copy of F1
    add(f1_4.part.moved(Location((0, 80, 0))))

    # F13 (on face) → F14 (cut, through all)
    with BuildSketch(Plane.XZ.offset(-41.5)):
        Polygon((50, -12.1), (50, -1.2), (22, -1.2), (22, -12.4), (48.8, -12.4), (50, -12.4), align=None)
        Polygon((22, -12.4), (22, -1.2), (22, 5), (-50, 5), (-50, -12.1), (-50, -12.4), (-48.8, -12.4), align=None)
    extrude(amount=-F14_DEPTH, mode=Mode.SUBTRACT)


solid = Compound([f1_4.part, f12_1.part])
